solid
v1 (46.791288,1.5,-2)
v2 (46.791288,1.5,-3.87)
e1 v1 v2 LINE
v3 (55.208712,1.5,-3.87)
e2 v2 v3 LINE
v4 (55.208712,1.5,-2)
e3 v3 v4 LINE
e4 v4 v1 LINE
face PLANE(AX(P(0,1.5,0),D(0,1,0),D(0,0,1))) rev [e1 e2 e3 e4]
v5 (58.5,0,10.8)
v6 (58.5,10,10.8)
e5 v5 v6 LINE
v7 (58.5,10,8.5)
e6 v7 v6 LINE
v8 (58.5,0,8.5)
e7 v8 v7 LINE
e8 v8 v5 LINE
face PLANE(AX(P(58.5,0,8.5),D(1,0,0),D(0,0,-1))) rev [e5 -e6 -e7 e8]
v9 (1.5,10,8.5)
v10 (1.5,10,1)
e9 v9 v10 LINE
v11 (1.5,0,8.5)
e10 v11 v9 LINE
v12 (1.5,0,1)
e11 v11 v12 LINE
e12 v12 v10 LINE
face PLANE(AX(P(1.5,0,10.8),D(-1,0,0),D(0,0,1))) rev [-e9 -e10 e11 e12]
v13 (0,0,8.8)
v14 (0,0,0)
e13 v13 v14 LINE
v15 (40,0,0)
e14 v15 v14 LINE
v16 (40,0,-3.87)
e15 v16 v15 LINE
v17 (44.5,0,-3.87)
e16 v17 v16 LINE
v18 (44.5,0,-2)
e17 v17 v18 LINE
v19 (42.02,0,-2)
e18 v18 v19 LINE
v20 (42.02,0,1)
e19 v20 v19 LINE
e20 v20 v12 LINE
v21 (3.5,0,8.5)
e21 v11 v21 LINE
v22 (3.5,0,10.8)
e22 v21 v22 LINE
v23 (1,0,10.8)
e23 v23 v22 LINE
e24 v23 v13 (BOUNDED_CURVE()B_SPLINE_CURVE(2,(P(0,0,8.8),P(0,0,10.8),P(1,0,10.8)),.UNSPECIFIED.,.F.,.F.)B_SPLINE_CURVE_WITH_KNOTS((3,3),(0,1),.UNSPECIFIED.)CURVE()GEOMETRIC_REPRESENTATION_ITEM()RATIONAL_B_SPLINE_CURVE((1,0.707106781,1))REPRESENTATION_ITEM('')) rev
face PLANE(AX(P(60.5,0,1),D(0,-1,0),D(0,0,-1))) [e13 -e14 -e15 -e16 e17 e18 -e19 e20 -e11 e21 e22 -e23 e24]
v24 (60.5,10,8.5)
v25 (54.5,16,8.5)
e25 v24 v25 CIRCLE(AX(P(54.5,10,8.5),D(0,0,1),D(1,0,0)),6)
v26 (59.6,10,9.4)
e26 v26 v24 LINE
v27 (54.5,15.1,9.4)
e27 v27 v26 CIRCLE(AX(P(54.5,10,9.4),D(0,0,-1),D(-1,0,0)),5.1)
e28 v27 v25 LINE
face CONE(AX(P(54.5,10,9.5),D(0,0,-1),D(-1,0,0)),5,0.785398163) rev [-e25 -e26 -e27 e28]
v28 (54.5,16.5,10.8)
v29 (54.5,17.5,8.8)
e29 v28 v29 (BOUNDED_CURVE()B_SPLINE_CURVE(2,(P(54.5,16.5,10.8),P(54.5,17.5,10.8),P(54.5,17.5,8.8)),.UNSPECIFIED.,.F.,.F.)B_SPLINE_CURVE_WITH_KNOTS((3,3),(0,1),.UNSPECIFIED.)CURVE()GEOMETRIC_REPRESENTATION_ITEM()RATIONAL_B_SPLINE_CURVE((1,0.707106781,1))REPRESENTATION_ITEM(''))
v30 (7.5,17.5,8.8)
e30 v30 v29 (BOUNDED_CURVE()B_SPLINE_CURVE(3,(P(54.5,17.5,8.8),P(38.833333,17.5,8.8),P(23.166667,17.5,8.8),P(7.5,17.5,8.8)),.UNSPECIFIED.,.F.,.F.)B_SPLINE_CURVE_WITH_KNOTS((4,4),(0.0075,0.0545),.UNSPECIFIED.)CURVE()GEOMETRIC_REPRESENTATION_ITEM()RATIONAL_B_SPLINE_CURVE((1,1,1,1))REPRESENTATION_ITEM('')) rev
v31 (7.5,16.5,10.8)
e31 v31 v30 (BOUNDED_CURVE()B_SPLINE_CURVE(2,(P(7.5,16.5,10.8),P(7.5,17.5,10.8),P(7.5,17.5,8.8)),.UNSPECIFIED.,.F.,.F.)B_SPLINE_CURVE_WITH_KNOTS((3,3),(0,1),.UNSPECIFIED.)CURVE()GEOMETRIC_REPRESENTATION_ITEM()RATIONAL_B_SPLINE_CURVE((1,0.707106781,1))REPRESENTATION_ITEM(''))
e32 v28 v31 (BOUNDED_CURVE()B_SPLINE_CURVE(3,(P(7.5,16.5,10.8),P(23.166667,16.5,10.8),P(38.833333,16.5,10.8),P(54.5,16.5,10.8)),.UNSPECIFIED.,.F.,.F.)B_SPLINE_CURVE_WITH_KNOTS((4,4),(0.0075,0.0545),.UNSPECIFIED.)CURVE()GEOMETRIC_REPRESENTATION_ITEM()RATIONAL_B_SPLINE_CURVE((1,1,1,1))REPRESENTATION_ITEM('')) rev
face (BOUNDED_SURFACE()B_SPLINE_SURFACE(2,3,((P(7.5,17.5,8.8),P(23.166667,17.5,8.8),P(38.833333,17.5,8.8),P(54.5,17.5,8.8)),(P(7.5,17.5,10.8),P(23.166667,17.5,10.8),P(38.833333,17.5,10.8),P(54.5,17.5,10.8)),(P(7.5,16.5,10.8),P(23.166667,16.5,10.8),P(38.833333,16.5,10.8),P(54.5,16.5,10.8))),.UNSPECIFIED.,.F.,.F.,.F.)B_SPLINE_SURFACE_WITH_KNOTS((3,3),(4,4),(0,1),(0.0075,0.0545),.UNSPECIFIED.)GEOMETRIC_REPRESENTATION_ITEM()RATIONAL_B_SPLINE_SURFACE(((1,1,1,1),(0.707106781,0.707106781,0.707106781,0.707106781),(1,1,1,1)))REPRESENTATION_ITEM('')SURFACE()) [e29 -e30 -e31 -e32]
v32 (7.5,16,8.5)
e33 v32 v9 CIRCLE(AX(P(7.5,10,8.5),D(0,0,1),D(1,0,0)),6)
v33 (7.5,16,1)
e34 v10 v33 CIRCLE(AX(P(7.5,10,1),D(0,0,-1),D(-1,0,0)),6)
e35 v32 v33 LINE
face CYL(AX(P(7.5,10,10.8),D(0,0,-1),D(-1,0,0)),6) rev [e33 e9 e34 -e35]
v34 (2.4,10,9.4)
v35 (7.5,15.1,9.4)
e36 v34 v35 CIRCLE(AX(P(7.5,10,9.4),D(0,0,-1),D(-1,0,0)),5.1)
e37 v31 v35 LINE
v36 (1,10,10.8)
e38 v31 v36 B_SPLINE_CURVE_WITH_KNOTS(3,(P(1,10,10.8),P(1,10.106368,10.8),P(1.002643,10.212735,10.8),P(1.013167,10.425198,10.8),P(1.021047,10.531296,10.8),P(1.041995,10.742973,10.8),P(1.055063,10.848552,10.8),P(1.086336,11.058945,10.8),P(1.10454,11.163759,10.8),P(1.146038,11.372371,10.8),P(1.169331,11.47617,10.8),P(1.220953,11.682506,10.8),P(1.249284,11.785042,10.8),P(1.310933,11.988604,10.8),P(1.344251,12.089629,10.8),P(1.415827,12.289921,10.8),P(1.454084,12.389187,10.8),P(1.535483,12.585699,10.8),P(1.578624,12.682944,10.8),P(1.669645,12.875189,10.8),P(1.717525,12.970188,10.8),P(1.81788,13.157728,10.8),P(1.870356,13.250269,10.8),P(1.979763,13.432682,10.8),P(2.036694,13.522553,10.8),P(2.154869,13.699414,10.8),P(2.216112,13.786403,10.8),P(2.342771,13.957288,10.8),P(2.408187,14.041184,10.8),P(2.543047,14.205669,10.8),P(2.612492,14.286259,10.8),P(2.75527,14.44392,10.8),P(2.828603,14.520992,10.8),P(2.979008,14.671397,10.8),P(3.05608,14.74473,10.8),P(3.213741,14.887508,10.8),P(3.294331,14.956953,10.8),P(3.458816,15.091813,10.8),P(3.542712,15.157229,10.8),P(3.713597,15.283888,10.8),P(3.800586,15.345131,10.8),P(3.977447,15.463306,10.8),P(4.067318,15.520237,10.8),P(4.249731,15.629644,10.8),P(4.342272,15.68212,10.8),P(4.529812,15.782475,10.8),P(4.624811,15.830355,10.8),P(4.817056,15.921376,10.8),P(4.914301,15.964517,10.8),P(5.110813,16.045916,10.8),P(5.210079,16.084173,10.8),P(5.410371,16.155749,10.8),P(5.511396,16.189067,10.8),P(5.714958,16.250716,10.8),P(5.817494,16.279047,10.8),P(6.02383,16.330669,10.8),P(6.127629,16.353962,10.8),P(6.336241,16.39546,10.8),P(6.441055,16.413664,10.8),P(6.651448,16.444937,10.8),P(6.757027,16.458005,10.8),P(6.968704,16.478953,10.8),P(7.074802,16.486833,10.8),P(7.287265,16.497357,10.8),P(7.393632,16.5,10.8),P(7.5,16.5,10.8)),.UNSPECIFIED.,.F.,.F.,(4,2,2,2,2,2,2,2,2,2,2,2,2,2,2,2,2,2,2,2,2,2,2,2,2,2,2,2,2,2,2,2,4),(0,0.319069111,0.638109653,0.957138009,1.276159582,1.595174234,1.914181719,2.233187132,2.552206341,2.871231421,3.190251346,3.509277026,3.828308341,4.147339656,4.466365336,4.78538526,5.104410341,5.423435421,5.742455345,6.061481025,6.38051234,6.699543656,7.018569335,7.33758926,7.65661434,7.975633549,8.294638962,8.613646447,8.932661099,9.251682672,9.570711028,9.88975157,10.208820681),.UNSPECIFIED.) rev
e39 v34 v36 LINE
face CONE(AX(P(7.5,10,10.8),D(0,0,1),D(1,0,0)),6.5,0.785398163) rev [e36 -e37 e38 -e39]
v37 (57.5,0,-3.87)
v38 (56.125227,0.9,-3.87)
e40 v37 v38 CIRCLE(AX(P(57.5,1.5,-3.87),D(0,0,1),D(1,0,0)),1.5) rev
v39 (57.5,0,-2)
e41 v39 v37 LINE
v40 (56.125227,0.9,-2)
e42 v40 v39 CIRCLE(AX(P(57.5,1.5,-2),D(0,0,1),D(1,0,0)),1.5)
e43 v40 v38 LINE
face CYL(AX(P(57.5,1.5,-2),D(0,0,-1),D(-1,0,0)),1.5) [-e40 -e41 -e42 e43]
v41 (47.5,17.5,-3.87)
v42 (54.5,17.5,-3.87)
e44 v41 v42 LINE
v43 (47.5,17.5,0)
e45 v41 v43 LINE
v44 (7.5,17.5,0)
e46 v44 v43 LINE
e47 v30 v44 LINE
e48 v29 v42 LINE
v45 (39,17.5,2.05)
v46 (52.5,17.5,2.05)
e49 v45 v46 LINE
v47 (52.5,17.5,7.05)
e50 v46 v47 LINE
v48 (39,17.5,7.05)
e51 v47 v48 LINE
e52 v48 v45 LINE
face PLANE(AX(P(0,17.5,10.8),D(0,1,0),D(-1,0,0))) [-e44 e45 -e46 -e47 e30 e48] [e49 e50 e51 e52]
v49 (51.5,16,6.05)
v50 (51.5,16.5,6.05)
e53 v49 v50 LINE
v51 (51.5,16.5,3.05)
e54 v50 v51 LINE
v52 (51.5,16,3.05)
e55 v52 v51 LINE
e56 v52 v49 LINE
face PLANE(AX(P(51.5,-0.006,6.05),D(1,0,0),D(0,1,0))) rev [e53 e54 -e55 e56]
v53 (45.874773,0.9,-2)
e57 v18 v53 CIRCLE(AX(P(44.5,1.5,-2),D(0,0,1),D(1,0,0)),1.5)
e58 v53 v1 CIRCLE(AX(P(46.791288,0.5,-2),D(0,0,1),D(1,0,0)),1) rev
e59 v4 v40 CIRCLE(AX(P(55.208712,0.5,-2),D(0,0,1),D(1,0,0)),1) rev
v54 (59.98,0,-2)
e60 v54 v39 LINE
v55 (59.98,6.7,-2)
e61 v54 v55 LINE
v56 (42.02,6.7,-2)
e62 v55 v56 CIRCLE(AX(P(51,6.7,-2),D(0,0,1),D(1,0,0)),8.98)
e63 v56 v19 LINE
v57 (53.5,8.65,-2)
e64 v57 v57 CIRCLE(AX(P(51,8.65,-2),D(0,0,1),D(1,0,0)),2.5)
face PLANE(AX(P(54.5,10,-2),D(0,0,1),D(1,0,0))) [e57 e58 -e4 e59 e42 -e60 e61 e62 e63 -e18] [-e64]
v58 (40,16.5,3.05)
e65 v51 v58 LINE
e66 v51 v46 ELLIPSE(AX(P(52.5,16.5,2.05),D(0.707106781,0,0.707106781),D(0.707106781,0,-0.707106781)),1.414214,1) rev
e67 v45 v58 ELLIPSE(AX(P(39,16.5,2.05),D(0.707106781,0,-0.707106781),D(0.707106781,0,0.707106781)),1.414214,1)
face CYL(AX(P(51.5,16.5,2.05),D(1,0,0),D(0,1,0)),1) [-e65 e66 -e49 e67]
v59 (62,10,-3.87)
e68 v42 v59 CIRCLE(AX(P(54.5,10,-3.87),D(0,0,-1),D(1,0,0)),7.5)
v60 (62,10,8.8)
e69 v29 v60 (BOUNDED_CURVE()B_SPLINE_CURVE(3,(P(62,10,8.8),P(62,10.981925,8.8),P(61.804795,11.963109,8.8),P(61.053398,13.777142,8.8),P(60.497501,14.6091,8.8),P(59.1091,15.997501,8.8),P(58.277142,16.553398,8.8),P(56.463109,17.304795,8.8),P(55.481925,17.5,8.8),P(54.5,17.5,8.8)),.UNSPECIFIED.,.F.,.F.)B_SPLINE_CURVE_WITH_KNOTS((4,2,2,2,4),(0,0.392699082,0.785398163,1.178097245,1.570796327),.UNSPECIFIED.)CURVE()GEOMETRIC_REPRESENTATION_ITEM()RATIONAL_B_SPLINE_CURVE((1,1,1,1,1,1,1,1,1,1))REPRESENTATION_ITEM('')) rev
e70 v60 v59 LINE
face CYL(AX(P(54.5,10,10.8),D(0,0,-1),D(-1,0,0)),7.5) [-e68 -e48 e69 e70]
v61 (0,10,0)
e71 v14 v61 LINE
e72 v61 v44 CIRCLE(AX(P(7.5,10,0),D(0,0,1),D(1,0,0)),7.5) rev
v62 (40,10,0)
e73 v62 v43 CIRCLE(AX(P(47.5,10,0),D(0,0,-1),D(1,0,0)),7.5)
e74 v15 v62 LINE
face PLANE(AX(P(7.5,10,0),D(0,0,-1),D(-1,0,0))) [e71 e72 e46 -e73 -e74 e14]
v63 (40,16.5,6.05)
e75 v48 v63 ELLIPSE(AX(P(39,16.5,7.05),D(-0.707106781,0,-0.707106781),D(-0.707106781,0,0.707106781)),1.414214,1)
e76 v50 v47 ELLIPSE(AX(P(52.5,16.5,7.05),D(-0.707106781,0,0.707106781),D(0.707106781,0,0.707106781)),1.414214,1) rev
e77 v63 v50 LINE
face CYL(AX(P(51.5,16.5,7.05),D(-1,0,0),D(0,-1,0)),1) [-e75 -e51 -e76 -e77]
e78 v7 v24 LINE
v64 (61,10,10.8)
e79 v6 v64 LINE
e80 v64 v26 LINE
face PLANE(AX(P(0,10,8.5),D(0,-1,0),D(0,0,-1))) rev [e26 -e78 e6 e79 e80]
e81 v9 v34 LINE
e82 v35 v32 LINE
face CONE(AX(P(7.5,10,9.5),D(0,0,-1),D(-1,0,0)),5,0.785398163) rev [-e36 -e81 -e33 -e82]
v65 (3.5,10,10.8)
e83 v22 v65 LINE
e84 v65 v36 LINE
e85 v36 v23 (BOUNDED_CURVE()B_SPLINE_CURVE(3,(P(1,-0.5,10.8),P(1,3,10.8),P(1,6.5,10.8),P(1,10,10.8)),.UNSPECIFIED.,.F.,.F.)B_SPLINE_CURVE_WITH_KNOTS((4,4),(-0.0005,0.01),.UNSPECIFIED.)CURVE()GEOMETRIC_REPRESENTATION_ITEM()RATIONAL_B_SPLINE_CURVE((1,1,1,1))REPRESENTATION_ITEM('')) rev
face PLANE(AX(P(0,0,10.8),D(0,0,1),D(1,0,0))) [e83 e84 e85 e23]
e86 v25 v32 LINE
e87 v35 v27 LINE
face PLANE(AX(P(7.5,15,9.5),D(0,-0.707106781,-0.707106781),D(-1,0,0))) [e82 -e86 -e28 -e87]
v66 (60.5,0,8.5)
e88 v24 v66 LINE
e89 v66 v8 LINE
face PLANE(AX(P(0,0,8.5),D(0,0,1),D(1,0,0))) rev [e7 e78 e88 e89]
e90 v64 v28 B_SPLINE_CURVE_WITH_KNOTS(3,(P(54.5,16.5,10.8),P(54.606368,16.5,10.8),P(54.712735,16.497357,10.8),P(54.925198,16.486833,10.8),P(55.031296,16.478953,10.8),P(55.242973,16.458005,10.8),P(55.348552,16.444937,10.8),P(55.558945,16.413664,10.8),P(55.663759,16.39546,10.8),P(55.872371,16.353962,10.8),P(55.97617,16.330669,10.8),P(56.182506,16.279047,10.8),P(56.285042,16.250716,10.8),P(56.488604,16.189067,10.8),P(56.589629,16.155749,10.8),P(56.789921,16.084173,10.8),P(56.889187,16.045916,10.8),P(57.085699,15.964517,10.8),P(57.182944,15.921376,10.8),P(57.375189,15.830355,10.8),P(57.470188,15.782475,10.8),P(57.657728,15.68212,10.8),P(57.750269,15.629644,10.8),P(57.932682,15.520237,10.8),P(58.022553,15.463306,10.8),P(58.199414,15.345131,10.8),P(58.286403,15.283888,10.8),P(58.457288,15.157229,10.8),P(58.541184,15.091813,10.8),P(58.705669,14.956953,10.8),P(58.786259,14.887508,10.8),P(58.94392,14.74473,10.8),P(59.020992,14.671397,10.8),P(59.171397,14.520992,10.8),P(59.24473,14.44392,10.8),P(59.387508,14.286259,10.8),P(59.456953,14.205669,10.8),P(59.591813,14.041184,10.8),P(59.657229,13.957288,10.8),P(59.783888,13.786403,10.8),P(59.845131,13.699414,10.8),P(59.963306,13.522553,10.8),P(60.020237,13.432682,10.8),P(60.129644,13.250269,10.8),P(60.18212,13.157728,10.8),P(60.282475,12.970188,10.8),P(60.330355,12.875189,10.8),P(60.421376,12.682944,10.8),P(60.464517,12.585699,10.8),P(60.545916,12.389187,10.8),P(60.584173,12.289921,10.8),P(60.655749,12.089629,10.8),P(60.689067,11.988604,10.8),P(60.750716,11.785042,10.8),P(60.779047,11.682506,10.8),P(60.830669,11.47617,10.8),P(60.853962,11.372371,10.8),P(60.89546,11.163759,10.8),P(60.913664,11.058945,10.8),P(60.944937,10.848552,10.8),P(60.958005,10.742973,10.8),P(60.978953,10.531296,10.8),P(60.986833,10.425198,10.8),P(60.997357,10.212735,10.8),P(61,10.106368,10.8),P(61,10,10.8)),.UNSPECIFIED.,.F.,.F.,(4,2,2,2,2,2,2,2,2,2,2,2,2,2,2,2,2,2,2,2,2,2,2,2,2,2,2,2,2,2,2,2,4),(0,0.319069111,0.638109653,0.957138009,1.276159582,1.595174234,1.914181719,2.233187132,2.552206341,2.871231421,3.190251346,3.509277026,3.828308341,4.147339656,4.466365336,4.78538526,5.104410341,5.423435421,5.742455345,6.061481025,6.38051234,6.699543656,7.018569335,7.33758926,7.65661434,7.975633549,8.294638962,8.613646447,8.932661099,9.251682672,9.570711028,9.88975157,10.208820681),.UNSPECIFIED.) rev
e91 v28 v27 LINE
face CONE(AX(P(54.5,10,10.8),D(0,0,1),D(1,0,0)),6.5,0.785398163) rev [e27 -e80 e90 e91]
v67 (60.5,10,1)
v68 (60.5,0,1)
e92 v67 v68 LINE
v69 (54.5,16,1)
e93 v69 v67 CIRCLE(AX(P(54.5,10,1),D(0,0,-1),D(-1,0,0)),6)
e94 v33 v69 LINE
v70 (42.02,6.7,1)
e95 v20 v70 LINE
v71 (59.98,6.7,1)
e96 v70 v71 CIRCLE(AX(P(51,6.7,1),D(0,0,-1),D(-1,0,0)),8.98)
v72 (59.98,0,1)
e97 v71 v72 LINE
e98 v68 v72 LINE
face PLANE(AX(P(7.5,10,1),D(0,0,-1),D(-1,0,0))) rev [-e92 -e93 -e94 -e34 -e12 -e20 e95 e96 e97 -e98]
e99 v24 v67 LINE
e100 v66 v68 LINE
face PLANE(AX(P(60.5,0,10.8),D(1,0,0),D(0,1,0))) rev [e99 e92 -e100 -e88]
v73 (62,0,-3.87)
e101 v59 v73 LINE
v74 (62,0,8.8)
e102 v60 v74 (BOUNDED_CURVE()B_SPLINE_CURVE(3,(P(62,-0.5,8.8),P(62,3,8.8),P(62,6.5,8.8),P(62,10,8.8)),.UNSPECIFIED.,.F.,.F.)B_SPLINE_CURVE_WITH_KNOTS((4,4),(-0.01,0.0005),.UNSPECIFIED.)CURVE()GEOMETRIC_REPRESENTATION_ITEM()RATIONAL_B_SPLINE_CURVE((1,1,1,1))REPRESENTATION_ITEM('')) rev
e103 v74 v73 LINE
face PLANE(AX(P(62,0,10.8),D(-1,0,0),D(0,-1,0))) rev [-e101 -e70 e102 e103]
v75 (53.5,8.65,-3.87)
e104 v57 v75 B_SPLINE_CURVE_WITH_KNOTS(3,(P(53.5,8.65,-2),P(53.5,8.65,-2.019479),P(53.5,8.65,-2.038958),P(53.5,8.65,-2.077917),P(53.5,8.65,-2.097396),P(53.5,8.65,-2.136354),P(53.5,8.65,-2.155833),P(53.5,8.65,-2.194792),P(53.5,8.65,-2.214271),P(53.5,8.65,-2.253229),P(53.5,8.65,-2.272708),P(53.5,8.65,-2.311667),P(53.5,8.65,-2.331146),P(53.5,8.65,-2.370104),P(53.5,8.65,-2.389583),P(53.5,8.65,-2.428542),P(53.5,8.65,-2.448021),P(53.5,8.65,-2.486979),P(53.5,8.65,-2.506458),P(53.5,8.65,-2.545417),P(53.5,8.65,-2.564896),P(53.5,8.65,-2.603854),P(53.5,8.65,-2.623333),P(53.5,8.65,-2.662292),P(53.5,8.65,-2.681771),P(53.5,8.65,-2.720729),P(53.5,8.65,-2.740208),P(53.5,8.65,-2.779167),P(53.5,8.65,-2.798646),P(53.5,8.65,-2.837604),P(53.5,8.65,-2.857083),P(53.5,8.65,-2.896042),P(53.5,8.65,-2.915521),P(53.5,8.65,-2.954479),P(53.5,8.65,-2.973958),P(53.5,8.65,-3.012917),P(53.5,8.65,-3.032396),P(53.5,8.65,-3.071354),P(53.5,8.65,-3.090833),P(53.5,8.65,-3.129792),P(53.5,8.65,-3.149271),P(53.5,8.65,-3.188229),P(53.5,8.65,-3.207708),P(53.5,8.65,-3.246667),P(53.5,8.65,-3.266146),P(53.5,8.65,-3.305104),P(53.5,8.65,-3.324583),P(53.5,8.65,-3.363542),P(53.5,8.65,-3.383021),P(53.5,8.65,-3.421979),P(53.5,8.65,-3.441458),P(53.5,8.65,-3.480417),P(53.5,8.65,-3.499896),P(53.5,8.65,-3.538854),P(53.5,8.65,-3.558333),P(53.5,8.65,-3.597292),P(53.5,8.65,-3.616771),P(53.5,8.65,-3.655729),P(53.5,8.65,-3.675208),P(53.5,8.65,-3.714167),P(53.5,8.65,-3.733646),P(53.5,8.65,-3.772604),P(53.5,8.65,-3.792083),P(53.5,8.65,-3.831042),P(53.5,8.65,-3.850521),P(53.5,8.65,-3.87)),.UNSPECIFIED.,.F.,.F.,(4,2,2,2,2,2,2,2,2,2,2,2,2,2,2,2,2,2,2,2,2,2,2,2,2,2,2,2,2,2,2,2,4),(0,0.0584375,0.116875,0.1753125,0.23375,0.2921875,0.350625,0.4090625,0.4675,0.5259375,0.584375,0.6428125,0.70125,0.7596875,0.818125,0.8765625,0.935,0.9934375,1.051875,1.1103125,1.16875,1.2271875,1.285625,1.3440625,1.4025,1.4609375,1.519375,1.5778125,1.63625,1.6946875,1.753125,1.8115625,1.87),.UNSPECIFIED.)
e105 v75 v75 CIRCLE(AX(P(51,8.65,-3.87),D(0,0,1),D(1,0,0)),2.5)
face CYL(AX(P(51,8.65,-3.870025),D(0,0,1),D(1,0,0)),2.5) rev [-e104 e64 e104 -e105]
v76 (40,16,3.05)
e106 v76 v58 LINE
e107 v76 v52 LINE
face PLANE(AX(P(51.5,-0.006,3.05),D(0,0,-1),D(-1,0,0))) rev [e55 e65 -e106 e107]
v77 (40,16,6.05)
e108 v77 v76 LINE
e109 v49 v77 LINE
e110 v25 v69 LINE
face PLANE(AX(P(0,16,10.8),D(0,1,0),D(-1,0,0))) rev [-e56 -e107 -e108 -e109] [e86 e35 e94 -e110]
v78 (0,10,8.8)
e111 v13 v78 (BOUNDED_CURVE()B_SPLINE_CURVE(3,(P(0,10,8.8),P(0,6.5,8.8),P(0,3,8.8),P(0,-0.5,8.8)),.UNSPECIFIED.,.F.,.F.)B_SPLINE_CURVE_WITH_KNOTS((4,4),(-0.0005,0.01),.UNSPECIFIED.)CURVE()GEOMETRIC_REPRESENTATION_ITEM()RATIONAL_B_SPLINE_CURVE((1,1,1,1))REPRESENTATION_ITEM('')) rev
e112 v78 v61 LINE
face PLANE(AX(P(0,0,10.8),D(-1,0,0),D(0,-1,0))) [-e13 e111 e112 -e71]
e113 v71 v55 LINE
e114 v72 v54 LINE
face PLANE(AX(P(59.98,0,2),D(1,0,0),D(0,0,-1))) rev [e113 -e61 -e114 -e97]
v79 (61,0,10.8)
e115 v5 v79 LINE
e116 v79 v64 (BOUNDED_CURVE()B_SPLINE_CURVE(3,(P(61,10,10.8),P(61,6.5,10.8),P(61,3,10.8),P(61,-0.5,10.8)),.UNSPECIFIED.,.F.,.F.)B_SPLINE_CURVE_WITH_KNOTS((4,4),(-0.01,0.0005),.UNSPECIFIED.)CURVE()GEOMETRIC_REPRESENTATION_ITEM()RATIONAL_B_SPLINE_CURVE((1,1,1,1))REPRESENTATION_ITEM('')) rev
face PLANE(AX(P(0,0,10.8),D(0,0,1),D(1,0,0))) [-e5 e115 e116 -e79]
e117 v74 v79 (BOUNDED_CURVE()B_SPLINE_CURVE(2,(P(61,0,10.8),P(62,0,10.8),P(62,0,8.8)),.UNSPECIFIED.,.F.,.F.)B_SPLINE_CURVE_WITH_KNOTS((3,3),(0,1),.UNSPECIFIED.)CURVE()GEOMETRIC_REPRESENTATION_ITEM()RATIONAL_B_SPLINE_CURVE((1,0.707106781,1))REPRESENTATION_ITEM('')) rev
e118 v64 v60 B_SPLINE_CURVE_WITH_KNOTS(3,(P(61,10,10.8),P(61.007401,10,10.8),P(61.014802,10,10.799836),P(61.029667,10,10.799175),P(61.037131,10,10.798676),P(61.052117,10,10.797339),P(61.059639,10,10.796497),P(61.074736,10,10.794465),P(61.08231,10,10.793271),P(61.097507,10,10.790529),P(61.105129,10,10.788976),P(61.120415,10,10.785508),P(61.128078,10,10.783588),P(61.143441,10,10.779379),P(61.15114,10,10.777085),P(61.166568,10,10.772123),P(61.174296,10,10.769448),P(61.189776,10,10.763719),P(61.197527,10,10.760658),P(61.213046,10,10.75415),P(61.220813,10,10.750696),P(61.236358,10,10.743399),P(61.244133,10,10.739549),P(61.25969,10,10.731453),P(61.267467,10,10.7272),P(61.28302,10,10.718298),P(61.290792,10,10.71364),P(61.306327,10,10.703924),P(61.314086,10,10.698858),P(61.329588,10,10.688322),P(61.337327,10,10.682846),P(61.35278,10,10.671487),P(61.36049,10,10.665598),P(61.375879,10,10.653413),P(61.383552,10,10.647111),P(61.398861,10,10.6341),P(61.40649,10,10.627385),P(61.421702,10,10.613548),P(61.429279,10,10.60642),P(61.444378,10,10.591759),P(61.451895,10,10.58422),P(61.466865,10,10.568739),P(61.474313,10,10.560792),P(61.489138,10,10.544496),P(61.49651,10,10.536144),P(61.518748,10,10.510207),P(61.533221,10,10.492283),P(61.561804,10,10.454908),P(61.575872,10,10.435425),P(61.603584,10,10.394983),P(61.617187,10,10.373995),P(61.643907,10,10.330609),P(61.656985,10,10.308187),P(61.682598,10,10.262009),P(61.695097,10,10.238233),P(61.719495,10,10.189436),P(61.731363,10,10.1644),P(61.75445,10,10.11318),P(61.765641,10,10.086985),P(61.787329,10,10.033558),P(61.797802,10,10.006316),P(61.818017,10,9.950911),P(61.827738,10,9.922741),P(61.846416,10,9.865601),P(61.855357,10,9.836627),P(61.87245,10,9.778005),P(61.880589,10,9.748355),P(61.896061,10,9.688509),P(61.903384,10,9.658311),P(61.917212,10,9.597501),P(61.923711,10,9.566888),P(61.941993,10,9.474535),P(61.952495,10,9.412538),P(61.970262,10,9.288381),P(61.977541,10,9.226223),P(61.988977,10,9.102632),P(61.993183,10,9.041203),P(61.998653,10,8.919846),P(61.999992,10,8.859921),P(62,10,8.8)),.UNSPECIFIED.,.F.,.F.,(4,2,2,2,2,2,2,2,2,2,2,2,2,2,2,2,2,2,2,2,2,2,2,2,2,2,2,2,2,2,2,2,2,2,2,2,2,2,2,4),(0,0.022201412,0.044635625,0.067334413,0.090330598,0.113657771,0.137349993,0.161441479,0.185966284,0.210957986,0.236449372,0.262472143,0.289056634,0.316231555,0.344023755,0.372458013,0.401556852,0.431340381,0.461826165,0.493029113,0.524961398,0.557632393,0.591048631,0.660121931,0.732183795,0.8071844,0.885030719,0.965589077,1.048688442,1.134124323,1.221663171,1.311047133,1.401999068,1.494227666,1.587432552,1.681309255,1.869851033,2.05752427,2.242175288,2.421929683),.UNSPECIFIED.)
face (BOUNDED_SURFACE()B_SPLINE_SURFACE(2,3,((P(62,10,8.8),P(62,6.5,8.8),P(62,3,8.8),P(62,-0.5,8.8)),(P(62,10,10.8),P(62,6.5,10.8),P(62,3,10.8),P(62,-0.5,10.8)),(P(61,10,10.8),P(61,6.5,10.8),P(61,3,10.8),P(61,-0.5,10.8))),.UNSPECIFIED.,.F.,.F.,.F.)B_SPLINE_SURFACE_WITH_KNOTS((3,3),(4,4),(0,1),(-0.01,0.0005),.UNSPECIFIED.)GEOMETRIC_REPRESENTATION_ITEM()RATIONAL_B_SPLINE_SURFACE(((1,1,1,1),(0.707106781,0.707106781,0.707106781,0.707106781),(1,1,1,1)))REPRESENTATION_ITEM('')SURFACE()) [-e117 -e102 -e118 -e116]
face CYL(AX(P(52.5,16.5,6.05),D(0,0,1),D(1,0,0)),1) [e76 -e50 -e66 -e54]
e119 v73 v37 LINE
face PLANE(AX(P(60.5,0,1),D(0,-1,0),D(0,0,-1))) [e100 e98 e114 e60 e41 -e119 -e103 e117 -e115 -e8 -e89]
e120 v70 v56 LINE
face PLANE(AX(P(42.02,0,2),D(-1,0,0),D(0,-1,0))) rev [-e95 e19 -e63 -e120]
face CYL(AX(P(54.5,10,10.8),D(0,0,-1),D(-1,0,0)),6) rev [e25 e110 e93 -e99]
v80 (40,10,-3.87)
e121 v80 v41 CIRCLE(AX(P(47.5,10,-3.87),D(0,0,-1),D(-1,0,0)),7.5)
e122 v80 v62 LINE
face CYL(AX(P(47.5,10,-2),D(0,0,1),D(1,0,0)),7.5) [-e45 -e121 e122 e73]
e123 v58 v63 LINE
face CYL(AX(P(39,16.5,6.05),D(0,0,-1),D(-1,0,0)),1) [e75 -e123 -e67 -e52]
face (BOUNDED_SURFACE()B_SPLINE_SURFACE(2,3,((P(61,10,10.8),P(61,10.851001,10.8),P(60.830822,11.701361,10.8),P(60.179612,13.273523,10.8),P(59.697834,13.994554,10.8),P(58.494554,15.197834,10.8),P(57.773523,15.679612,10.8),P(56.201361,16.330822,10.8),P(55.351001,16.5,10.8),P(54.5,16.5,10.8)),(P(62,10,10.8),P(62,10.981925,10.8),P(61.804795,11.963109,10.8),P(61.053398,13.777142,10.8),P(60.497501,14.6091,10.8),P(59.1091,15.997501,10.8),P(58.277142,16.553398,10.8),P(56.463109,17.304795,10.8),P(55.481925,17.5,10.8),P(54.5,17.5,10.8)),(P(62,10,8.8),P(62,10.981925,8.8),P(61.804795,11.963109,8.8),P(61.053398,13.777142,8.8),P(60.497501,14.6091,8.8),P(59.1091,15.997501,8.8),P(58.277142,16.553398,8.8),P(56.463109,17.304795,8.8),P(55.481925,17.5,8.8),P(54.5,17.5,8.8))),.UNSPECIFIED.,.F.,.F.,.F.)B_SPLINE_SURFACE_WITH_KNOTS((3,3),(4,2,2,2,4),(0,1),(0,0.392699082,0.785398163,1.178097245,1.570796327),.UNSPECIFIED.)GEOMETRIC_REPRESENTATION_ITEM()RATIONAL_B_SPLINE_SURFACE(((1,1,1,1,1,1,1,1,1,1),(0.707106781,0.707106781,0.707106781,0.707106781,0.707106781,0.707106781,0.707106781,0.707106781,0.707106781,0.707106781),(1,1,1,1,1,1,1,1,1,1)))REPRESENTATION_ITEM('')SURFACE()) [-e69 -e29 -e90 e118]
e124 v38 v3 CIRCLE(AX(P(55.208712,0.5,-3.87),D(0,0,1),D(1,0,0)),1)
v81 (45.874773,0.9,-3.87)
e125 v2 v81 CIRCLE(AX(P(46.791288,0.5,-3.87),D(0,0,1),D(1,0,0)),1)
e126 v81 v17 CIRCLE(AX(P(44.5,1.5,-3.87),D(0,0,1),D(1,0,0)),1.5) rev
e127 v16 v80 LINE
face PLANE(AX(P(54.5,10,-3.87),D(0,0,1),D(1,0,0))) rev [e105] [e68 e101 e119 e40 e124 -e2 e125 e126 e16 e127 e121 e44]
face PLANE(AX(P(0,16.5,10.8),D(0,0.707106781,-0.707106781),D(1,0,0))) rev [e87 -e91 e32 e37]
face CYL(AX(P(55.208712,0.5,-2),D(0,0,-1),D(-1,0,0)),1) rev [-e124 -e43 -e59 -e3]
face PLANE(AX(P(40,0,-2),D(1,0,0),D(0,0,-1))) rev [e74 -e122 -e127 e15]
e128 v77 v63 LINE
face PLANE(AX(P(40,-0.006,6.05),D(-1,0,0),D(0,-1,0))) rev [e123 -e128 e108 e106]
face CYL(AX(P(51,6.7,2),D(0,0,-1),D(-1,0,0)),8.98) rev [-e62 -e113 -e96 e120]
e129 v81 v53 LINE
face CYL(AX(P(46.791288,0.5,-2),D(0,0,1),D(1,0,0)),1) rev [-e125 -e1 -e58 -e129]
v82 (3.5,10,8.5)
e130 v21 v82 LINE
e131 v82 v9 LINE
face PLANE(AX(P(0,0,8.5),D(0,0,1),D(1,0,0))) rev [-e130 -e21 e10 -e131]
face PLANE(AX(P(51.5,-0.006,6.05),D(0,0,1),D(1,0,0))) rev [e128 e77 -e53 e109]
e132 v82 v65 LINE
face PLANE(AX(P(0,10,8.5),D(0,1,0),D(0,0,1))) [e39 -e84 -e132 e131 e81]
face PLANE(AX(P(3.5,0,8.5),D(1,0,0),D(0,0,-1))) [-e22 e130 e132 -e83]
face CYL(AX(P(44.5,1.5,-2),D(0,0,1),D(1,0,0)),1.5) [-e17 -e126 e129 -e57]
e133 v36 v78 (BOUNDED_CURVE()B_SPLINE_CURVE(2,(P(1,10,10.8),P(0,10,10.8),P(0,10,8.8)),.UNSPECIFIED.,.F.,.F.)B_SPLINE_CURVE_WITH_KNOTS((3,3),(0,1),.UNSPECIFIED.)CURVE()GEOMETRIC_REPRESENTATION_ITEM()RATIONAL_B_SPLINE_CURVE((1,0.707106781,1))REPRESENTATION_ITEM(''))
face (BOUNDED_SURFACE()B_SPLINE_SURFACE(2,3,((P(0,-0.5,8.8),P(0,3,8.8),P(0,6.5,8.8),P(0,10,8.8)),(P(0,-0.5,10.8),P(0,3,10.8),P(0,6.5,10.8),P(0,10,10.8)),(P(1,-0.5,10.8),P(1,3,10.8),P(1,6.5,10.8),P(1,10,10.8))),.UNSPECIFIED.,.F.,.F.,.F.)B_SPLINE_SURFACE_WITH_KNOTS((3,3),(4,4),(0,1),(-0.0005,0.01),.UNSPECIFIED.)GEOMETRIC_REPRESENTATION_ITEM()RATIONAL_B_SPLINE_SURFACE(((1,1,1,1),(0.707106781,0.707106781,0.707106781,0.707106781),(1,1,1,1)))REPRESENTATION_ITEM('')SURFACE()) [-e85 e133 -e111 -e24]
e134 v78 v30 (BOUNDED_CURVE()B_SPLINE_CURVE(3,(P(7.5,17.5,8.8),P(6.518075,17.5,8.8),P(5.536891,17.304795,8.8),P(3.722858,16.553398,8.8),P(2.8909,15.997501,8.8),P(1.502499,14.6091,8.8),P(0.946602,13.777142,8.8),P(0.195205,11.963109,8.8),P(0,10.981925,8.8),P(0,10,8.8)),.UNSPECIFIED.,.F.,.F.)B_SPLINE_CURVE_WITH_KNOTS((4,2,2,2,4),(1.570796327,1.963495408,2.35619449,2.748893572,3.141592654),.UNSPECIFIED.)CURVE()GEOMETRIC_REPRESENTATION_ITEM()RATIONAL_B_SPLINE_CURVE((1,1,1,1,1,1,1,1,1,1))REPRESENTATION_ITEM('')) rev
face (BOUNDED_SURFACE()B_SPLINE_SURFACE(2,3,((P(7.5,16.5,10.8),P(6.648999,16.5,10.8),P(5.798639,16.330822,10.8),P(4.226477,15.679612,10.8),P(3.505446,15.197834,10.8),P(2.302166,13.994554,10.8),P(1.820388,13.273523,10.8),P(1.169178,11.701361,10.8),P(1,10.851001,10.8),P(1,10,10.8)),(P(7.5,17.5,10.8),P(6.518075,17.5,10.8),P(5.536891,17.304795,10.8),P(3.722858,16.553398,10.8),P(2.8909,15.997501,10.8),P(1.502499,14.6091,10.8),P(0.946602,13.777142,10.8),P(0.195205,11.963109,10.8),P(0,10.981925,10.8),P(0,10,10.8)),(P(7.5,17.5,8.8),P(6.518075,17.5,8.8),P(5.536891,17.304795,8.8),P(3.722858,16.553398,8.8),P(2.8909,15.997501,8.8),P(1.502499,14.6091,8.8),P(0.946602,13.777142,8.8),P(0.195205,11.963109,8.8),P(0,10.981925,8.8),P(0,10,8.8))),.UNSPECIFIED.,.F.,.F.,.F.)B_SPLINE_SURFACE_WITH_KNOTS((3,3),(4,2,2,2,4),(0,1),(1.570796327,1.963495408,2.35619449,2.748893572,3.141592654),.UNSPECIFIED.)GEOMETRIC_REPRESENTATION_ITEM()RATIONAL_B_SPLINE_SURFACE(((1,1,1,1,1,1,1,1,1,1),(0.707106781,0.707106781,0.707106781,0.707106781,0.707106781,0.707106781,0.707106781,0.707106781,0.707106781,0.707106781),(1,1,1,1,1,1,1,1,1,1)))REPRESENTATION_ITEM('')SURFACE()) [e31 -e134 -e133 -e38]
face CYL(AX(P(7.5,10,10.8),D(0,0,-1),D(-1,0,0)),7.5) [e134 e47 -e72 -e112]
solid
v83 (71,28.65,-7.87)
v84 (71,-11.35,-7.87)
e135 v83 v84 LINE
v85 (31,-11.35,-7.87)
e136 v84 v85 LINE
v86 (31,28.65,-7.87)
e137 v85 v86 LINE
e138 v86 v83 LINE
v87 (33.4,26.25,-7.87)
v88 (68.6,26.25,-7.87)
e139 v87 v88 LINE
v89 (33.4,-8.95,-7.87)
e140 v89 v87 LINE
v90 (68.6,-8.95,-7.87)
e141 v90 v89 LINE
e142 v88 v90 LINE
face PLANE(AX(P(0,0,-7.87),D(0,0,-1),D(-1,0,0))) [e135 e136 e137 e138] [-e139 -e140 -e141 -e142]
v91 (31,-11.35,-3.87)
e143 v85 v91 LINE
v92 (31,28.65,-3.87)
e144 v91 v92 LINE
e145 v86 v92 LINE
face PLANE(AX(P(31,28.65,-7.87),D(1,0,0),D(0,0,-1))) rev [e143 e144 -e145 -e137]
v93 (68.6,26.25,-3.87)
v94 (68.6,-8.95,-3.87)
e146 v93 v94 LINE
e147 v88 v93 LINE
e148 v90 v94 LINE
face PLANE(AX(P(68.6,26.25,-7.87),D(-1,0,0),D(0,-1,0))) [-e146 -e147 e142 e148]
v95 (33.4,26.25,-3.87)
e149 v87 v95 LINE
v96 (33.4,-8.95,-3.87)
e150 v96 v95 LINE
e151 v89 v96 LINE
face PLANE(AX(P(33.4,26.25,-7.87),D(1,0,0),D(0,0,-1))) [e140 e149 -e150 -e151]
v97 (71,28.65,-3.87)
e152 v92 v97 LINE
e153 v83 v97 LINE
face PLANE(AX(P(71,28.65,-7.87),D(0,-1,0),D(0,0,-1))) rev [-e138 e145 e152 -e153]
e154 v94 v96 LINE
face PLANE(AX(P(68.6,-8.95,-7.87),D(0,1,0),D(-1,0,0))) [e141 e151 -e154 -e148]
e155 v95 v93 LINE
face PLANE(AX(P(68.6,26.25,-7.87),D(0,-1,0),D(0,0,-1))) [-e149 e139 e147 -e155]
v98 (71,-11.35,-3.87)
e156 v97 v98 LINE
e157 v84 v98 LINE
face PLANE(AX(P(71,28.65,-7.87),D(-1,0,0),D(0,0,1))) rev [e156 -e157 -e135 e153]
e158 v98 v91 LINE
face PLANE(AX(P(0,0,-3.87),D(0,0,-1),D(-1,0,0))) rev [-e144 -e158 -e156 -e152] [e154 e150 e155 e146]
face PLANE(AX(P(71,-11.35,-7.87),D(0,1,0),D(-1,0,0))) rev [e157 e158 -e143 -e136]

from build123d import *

# Parameters (mm, degrees)
BOSS_EXTRUDE1_DEPTH = 10.8
BOSS_EXTRUDE2_DEPTH = 1
SKETCH3_W           = 2
SKETCH3_H           = 10
BOSS_EXTRUDE3_DEPTH = 2.3
FILLET1_SIZE        = 2
FILLET1_SIZE_2      = 1
CUT_EXTRUDE1_REACH  = 67.321
SKETCH4_W           = 11.5
SKETCH4_H           = 3
BOSS_EXTRUDE4_DEPTH = 2.3
CHAMFER1_SIZE       = 1.5
CUT_EXTRUDE2_DEPTH  = 2
BOSS_EXTRUDE6_DEPTH = 2
FILLET2_R           = 1
BOSS_EXTRUDE7_DEPTH = 1.87
SKETCH11_R          = 2.5
CUT_EXTRUDE3_DEPTH  = 66.681732761
SKETCH19_W          = 10
SKETCH19_H          = 1.87
CUT_EXTRUDE5_DEPTH  = 1.5
FILLET7_R           = 1.5
FILLET8_R           = 1
SKETCH20_W          = 40
SKETCH20_H          = 40
SKETCH20_W_2        = 35.2
SKETCH20_H_2        = 35.2
BOSS_EXTRUDE8_DEPTH = 4


with BuildPart() as part:
    # Sketch1 → Boss-Extrude1 (new body)
    with BuildSketch(Plane.XY):
        with BuildLine():
            Line((31, 16), (31, 17.5))
            Line((31, 17.5), (7.5, 17.5))
            ThreePointArc((7.5, 17.5), (2.196699141, 15.303300859), (0, 10))
            Line((0, 10), (0, 0))
            Line((0, 0), (1.5, 0))
            Line((1.5, 0), (1.5, 10))
            ThreePointArc((1.5, 10), (3.257359313, 14.242640687), (7.5, 16))
            Line((7.5, 16), (31, 16))
        make_face()
        with BuildLine():
            Line((54.5, 17.5), (31, 17.5))
            Line((31, 17.5), (31, 16))
            Line((31, 16), (54.5, 16))
            ThreePointArc((54.5, 16), (58.742640687, 14.242640687), (60.5, 10))
            Line((60.5, 10), (60.5, 0))
            Line((60.5, 0), (62, 0))
            Line((62, 0), (62, 10))
            ThreePointArc((62, 10), (59.803300859, 15.303300859), (54.5, 17.5))
        make_face()
    extrude(amount=BOSS_EXTRUDE1_DEPTH)


with BuildPart() as body_2:
    # Sketch2 → Boss-Extrude2 (new body)
    with BuildSketch(Plane(origin=(0, 0, 0), x_dir=(-1, 0, 0), z_dir=(0, 0, -1))):
        with BuildLine():
            Line((-1.5, 0), (-1.5, 10))
            ThreePointArc((-1.5, 10), (-3.257359313, 14.242640687), (-7.5, 16))
            Line((-7.5, 16), (-54.5, 16))
            ThreePointArc((-54.5, 16), (-58.742640687, 14.242640687), (-60.5, 10))
            Line((-60.5, 10), (-60.5, 0))
            Line((-60.5, 0), (-1.5, 0))
        make_face()
    extrude(amount=-BOSS_EXTRUDE2_DEPTH)

    # Combine1: union part
    add(part.part)

    # Sketch3 → Boss-Extrude3 (add)
    with BuildSketch(Plane.XY.offset(10.8)):
        with Locations((2.5, 5)):
            Rectangle(SKETCH3_W, SKETCH3_H)
        with Locations((59.5, 5)):
            Rectangle(SKETCH3_W, SKETCH3_H)
    extrude(amount=-BOSS_EXTRUDE3_DEPTH)

    # Fillet1
    # a fillet whose section is not a circle: 2, 1 mm, written as the material it takes off along each edge
    with BuildSketch(Plane(origin=(0, 10, 10.8), x_dir=(0, 0, -1), z_dir=(0, -1, 0))) as fillet1_piece_1:
        with BuildLine():
            Bezier((FILLET1_SIZE, 0), (0, 0), (0, FILLET1_SIZE_2), weights=[1, 0.707106781, 1])
            Line((0, FILLET1_SIZE_2), (0, 0))
            Line((0, 0), (FILLET1_SIZE, 0))
        make_face()
    extrude(amount=15, mode=Mode.SUBTRACT)
    with BuildSketch(Plane(origin=(62, -5, 10.8), x_dir=(-1, 0, 0), z_dir=(0, 1, 0))) as fillet1_piece_2:
        with BuildLine():
            Bezier((FILLET1_SIZE_2, 0), (0, 0), (0, -FILLET1_SIZE), weights=[1, 0.707106781, 1])
            Line((0, -FILLET1_SIZE), (0, 0))
            Line((0, 0), (FILLET1_SIZE_2, 0))
        make_face()
    extrude(amount=15, mode=Mode.SUBTRACT)
    with BuildSketch(Plane(origin=(7.5, 10, 10.8), x_dir=(0, 1, 0), z_dir=(1, 0, 0))) as fillet1_piece_3:
        with BuildLine():
            Bezier((7.5, -FILLET1_SIZE), (7.5, 0), (7.5 - FILLET1_SIZE_2, 0), weights=[1, 0.707106781, 1])
            Line((7.5 - FILLET1_SIZE_2, 0), (7.5, 0))
            Line((7.5, 0), (7.5, -FILLET1_SIZE))
        make_face()
    revolve(axis=Axis((7.5, 10, 10.8), (0, 0, 1)), revolution_arc=90, mode=Mode.SUBTRACT)
    with BuildSketch(Plane(origin=(54.5, 10, 10.8), x_dir=(1, 0, 0), z_dir=(0, -1, 0))) as fillet1_piece_4:
        with BuildLine():
            Bezier((7.5, -FILLET1_SIZE), (7.5, 0), (7.5 - FILLET1_SIZE_2, 0), weights=[1, 0.707106781, 1])
            Line((7.5 - FILLET1_SIZE_2, 0), (7.5, 0))
            Line((7.5, 0), (7.5, -FILLET1_SIZE))
        make_face()
    revolve(axis=Axis((54.5, 10, 10.8), (0, 0, 1)), revolution_arc=90, mode=Mode.SUBTRACT)
    with BuildSketch(Plane(origin=(7.5, 17.5, 10.8), x_dir=(0, 0, -1), z_dir=(1, 0, 0))) as fillet1_piece_5:
        with BuildLine():
            Bezier((FILLET1_SIZE, 0), (0, 0), (0, -FILLET1_SIZE_2), weights=[1, 0.707106781, 1])
            Line((0, -FILLET1_SIZE_2), (0, 0))
            Line((0, 0), (FILLET1_SIZE, 0))
        make_face()
    extrude(amount=47, mode=Mode.SUBTRACT)

    # Sketch4 → Cut-Extrude1 (cut, up to next)
    with BuildSketch(Plane(origin=(0, 17.5, 0), x_dir=(1, 0, 0), z_dir=(0, 1, 0)), mode=Mode.PRIVATE) as cut_extrude1_sk1:
        with Locations((45.75, -4.55)):
            Rectangle(SKETCH4_W, SKETCH4_H)
    cut_extrude1_tool1 = extrude(cut_extrude1_sk1.sketch, amount=-CUT_EXTRUDE1_REACH, mode=Mode.PRIVATE) & body_2.part
    add(cut_extrude1_tool1.solids().sort_by_distance((45.75, 17.5, 4.55))[0], mode=Mode.SUBTRACT)

    # Sketch5 → Boss-Extrude4 (add)
    with BuildSketch(Plane.XY.offset(10.8)):
        with BuildLine():
            Line((7.5, 15), (54.5, 15))
            ThreePointArc((54.5, 15), (58.035533906, 13.535533906), (59.5, 10))
            Line((59.5, 10), (60.5, 10))
            ThreePointArc((60.5, 10), (58.742640687, 14.242640687), (54.5, 16))
            Line((54.5, 16), (7.5, 16))
            ThreePointArc((7.5, 16), (3.257359313, 14.242640687), (1.5, 10))
            Line((1.5, 10), (2.5, 10))
            ThreePointArc((2.5, 10), (3.964466094, 13.535533906), (7.5, 15))
        make_face()
    extrude(amount=-BOSS_EXTRUDE4_DEPTH)

    # Chamfer1
    chamfer1_edges = [body_2.edges().sort_by_distance(p)[0] for p in [
        (3.964466094, 13.535533906, 10.8),
        (31, 15, 10.8),
        (58.035533906, 13.535533906, 10.8),
    ]]
    chamfer(chamfer1_edges, length=CHAMFER1_SIZE - 0.0001)  # a hair under: the kernel refuses the full size

    # Chamfer3: read off the stored shape, not the designer's step
    # Chamfer3: loft between two sections, ruled curve by curve
    chamfer3_from = [
        Edge.make_three_point_arc((2.4, 10, 9.4), (3.893755416, 13.606244584, 9.4), (7.5, 15.1, 9.4)),
        Edge.make_three_point_arc((54.5, 15.1, 9.4), (58.106244584, 13.606244584, 9.4), (59.6, 10, 9.4)),
        Edge.make_line((7.5, 15.1, 9.4), (54.5, 15.1, 9.4)),
        Edge.make_line((59.6, 10, 9.4), (2.4, 10, 9.4)),
    ]
    chamfer3_to = [
        Edge.make_three_point_arc((1.5, 10, 8.5), (3.257359313, 14.242640687, 8.5), (7.5, 16, 8.5)),
        Edge.make_three_point_arc((54.5, 16, 8.5), (58.742640687, 14.242640687, 8.5), (60.5, 10, 8.5)),
        Edge.make_line((7.5, 16, 8.5), (54.5, 16, 8.5)),
        Edge.make_line((60.5, 10, 8.5), (1.5, 10, 8.5)),
    ]
    chamfer3 = Solid(Shell([*[Face.make_surface_from_curves(chamfer3_from[k], chamfer3_to[k]) for k in range(4)], Face(Wire(chamfer3_from)), Face(Wire(chamfer3_to))]))
    add(chamfer3, mode=Mode.SUBTRACT)

    # Sketch6 → Cut-Extrude2 (cut)
    with BuildSketch(Plane(origin=(0, 0, 0), x_dir=(-1, 0, 0), z_dir=(0, 0, -1))):
        with BuildLine():
            Line((-59.98, 0), (-59.98, 6.7))
            ThreePointArc((-59.98, 6.7), (-51, 15.68), (-42.02, 6.7))
            Line((-42.02, 6.7), (-42.02, 0))
            Line((-42.02, 0), (-59.98, 0))
        make_face()
    extrude(amount=-CUT_EXTRUDE2_DEPTH, mode=Mode.SUBTRACT)

    # Sketch9 → Boss-Extrude6 (add)
    with BuildSketch(Plane(origin=(0, 0, 0), x_dir=(-1, 0, 0), z_dir=(0, 0, -1))):
        with BuildLine():
            Line((-62, 10), (-62, 0))
            Line((-62, 0), (-59.98, 0))
            Line((-59.98, 0), (-59.98, 6.7))
            ThreePointArc((-59.98, 6.7), (-51, 15.68), (-42.02, 6.7))
            Line((-42.02, 6.7), (-42.02, 0))
            Line((-42.02, 0), (-40, 0))
            Line((-40, 0), (-40, 10))
            ThreePointArc((-40, 10), (-42.196699141, 15.303300859), (-47.5, 17.5))
            Line((-47.5, 17.5), (-54.5, 17.5))
            ThreePointArc((-54.5, 17.5), (-59.803300859, 15.303300859), (-62, 10))
        make_face()
    extrude(amount=BOSS_EXTRUDE6_DEPTH)

    # Fillet2
    fillet2_edges = [body_2.edges().sort_by_distance(p)[0] for p in [
        (51.5, 17.5, 4.55),
        (45.75, 17.5, 3.05),
        (40, 17.5, 4.55),
        (45.75, 17.5, 6.05),
    ]]
    fillet(fillet2_edges, radius=FILLET2_R)

    # Sketch10 → Boss-Extrude7 (add)
    with BuildSketch(Plane(origin=(0, 0, -2), x_dir=(-1, 0, 0), z_dir=(0, 0, -1))):
        with BuildLine():
            Line((-62, 10), (-62, 0))
            Line((-62, 0), (-40, 0))
            Line((-40, 0), (-40, 10))
            ThreePointArc((-40, 10), (-42.196699141, 15.303300859), (-47.5, 17.5))
            Line((-47.5, 17.5), (-54.5, 17.5))
            ThreePointArc((-54.5, 17.5), (-59.803300859, 15.303300859), (-62, 10))
        make_face()
    extrude(amount=BOSS_EXTRUDE7_DEPTH)

    # Sketch11 → Cut-Extrude3 (cut, through all)
    with BuildSketch(Plane.XY.offset(-2)):
        with Locations((51, 8.65)):
            Circle(SKETCH11_R)
    extrude(amount=-CUT_EXTRUDE3_DEPTH, mode=Mode.SUBTRACT)

    # Sketch19 → Cut-Extrude5 (cut)
    with BuildSketch(Plane.XZ):
        with Locations((51, -2.935)):
            Rectangle(SKETCH19_W, SKETCH19_H)
    extrude(amount=-CUT_EXTRUDE5_DEPTH, mode=Mode.SUBTRACT)

    # Fillet7
    fillet7_edges = [body_2.edges().sort_by_distance(p)[0] for p in [
        (46, 0, -2.935),
        (56, 0, -2.935),
    ]]
    fillet(fillet7_edges, radius=FILLET7_R - 0.0001)  # a hair under: the kernel refuses the full size

    # Fillet8
    fillet8_edges = [body_2.edges().sort_by_distance(p)[0] for p in [
        (56, 1.5, -2.935),
        (46, 1.5, -2.935),
    ]]
    fillet(fillet8_edges, radius=FILLET8_R)


with BuildPart() as body_2_2:
    # Sketch20 → Boss-Extrude8 (new body)
    with BuildSketch(Plane(origin=(0, 0, -3.87), x_dir=(-1, 0, 0), z_dir=(0, 0, -1))):
        with Locations((-51, 8.65)):
            Rectangle(SKETCH20_W, SKETCH20_H)
        with Locations((-51, 8.65)):
            Rectangle(SKETCH20_W_2, SKETCH20_H_2, mode=Mode.SUBTRACT)
    extrude(amount=BOSS_EXTRUDE8_DEPTH)


solid = Compound([body_2.part, body_2_2.part])
